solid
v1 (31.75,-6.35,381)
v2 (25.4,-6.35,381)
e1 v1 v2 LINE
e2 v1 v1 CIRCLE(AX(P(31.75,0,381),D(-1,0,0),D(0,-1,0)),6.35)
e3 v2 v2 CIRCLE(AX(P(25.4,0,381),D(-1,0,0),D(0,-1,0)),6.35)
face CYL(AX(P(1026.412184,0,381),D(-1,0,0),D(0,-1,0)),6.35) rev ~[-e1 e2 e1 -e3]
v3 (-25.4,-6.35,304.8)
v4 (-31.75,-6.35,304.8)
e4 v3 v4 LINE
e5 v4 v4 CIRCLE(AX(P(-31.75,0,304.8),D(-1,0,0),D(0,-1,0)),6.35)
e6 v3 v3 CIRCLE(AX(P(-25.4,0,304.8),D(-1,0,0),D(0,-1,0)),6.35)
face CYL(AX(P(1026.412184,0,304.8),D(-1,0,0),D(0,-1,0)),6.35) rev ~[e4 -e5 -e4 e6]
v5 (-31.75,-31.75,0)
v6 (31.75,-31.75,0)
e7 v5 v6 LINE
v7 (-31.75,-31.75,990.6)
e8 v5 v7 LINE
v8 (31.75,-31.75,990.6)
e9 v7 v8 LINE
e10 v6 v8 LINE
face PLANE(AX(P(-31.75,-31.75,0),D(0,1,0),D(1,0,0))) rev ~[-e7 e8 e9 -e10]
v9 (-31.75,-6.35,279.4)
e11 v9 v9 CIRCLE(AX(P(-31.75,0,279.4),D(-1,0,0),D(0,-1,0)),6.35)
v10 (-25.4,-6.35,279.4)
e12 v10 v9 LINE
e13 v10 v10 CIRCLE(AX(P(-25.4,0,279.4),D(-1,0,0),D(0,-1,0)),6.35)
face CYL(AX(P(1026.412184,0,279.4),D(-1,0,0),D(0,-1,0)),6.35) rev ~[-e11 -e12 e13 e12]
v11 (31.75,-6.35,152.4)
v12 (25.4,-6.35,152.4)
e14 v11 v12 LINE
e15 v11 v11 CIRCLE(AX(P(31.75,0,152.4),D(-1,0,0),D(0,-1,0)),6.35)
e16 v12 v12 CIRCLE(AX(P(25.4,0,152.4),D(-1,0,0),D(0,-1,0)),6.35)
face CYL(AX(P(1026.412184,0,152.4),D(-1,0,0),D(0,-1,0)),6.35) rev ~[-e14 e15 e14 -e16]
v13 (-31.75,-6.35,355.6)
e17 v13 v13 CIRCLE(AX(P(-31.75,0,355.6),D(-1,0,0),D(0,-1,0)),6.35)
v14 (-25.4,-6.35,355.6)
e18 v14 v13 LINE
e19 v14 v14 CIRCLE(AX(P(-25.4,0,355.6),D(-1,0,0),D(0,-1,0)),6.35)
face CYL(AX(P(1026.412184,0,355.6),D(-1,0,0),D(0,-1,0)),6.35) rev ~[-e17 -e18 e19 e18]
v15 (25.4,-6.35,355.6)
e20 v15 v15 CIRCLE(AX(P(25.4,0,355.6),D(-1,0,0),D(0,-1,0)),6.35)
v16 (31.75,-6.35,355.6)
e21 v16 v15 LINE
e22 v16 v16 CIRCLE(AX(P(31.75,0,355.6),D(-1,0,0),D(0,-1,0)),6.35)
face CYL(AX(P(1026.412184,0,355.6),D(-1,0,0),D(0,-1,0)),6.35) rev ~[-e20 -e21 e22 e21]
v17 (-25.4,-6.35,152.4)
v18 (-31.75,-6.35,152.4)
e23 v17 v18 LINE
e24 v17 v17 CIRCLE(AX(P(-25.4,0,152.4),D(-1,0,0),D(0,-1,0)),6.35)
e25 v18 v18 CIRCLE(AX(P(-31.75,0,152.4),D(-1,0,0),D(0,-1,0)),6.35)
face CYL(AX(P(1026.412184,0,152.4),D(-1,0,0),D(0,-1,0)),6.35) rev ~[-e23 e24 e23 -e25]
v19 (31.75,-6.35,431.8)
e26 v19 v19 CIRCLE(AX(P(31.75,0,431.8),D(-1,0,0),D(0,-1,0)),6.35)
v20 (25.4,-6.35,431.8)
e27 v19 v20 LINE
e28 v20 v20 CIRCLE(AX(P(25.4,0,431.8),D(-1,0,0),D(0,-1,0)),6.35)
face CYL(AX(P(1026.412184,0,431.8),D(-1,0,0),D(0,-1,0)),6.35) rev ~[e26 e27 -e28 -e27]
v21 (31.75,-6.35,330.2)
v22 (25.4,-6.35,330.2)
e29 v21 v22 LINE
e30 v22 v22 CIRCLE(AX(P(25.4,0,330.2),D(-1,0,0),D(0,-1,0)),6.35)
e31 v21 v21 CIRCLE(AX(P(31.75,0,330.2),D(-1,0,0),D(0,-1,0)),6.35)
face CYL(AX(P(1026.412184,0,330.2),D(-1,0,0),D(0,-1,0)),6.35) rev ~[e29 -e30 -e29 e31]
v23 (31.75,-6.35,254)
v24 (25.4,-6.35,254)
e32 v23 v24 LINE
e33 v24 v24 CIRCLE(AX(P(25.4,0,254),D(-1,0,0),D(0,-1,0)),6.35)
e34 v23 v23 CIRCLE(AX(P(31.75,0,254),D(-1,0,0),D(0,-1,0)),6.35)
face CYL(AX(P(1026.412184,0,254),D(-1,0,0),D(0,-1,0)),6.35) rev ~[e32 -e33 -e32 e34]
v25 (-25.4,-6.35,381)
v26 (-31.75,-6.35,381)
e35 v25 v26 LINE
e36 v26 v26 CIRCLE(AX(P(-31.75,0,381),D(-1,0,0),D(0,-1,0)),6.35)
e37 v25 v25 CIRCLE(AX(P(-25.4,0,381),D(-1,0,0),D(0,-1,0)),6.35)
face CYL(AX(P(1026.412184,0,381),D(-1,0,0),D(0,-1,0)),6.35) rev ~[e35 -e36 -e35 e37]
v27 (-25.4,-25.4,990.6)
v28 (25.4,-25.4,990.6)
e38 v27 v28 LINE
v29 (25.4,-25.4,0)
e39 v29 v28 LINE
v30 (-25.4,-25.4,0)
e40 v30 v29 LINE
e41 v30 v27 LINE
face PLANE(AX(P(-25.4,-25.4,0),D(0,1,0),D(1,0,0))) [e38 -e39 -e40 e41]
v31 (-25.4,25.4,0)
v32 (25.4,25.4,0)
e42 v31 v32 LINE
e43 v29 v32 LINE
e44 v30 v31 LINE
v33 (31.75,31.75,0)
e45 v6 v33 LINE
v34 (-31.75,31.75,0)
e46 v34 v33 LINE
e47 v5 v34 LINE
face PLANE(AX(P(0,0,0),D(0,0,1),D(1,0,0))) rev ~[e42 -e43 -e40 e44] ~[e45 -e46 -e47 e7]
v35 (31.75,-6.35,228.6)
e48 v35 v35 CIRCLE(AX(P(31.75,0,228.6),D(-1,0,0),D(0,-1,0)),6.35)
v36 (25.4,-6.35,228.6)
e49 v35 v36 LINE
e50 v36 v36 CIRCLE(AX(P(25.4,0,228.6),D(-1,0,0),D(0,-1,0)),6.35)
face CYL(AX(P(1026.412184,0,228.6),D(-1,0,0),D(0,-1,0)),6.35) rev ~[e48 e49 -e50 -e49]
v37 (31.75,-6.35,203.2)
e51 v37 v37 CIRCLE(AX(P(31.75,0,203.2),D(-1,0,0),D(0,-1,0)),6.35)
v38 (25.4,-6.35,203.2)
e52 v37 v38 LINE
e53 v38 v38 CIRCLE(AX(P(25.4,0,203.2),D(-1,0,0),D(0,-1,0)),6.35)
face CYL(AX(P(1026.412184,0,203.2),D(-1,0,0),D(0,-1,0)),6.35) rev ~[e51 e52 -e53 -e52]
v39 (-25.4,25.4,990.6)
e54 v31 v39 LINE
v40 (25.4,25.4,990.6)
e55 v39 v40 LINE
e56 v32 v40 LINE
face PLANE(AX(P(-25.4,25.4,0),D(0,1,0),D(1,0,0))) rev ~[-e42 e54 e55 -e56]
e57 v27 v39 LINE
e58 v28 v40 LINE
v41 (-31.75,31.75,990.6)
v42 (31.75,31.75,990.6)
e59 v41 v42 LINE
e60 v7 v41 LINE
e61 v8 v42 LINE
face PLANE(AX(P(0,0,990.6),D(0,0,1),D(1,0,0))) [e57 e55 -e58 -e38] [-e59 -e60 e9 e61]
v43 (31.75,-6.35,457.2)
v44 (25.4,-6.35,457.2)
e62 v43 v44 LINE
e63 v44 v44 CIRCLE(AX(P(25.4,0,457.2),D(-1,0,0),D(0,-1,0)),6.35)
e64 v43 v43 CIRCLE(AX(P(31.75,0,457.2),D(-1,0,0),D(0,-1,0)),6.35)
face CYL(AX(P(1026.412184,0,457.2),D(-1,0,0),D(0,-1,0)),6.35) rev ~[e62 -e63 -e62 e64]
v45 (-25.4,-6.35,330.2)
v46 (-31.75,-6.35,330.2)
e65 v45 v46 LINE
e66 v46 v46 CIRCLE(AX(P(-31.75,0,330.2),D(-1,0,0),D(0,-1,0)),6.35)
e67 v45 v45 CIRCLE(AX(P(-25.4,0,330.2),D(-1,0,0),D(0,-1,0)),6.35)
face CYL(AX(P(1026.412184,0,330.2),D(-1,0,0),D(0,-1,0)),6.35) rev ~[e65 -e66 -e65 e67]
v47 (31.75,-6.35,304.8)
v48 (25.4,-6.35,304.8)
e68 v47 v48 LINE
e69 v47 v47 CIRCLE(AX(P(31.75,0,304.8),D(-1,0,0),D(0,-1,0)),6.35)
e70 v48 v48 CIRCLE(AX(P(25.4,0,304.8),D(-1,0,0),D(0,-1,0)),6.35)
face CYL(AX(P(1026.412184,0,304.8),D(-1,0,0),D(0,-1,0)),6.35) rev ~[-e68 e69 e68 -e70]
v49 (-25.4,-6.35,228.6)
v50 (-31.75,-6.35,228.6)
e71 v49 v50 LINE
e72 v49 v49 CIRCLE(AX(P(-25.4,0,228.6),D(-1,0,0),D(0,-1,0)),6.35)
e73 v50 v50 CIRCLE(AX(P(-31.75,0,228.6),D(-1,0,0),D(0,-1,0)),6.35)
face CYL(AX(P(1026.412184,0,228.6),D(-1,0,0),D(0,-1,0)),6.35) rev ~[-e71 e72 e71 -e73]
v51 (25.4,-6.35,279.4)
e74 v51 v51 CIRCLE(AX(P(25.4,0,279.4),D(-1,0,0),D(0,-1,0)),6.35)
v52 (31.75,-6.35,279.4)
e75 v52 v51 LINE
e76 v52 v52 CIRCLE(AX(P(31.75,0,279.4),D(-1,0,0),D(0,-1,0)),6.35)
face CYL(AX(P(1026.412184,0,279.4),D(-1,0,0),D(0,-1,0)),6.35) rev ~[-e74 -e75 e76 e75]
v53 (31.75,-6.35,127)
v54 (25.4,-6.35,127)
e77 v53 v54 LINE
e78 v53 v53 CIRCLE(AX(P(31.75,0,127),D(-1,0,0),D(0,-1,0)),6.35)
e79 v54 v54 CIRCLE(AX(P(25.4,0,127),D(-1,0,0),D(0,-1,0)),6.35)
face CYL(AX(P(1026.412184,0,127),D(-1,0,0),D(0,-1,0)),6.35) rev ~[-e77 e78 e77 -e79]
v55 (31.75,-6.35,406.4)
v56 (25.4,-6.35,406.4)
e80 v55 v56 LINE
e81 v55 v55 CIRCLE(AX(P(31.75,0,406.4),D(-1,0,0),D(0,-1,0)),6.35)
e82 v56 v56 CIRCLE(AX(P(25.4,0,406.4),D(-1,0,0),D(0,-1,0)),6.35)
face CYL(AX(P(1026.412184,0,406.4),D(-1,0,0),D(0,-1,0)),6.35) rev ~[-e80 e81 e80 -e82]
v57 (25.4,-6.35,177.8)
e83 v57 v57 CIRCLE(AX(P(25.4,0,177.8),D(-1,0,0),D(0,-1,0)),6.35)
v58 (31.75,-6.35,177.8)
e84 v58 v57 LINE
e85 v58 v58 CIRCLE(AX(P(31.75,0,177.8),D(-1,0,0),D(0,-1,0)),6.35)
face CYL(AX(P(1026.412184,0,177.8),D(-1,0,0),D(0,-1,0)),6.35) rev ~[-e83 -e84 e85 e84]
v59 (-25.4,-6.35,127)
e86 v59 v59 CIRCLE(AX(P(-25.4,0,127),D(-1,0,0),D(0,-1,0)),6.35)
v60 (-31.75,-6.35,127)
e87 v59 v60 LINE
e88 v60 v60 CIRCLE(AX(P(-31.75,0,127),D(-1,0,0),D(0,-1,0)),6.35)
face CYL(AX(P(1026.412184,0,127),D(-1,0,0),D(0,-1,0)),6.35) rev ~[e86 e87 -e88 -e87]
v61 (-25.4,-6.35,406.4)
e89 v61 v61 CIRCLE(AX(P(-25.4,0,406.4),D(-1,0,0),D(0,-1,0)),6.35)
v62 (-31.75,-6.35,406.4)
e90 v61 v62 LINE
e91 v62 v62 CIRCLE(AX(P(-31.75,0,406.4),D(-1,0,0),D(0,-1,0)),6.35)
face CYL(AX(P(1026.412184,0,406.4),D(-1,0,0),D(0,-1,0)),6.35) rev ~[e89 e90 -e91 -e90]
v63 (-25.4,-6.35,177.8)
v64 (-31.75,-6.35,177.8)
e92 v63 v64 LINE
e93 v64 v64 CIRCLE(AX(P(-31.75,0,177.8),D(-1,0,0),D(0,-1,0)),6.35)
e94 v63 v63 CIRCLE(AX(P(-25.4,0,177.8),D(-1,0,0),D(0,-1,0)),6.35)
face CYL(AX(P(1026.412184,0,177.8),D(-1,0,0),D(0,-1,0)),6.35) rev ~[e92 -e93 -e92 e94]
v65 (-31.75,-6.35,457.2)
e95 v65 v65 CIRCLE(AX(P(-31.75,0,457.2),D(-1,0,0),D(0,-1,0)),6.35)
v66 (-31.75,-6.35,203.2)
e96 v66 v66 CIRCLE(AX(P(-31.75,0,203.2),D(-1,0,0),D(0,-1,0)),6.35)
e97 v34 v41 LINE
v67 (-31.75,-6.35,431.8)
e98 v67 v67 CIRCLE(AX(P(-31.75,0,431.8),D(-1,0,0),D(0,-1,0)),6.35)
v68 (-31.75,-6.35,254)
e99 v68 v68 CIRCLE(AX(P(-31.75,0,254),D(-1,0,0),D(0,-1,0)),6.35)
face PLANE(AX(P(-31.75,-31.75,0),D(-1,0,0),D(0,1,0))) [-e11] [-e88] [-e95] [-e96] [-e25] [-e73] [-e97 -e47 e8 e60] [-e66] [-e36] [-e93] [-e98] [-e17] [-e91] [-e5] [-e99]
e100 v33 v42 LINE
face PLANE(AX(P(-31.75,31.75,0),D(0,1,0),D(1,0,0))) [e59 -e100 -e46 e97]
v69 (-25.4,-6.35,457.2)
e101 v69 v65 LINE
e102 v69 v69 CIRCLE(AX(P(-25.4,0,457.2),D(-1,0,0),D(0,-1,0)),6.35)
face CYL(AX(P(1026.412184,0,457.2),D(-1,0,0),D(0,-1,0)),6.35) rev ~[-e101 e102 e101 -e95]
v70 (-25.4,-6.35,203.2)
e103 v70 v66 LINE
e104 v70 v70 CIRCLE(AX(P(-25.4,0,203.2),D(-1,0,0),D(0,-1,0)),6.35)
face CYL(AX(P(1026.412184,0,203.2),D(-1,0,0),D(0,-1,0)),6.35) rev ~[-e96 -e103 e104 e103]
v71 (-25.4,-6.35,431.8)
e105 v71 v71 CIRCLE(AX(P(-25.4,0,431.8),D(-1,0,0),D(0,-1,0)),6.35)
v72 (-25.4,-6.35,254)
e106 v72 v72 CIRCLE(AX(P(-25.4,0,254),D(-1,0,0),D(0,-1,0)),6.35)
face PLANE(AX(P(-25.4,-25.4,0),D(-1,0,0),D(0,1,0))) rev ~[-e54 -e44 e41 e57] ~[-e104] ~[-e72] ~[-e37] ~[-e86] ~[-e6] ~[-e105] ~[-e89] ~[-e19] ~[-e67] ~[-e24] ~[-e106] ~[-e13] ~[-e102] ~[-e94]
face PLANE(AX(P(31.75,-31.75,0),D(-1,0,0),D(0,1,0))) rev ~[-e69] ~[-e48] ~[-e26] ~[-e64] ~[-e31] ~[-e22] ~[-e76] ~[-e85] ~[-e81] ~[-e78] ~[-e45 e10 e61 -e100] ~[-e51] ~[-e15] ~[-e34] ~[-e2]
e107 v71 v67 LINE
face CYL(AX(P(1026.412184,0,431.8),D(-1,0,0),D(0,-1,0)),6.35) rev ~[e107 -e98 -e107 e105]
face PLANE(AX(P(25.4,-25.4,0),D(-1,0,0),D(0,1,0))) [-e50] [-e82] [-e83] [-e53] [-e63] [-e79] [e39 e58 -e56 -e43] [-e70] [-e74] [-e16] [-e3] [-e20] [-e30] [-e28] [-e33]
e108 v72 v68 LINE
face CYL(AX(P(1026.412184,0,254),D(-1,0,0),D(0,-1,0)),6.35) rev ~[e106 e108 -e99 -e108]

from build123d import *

# Parameters (mm, degrees)
F0_W     = 63.5
F0_H     = 63.5
F0_W_2   = 50.8
F0_H_2   = 50.8
F1_DEPTH = 990.6
F3_D     = 12.7


# Not quite as in the source:
# - a length typed as a fraction of an inch, garbled in the dataset ("3 / 203.2 mm" for 3/8 in), is restored


with BuildPart() as f1:
    # F0 (on Top) → F1 (new body)
    with BuildSketch(Plane.XY):
        Rectangle(F0_W, F0_H)
        Rectangle(F0_W_2, F0_H_2, mode=Mode.SUBTRACT)
    extrude(amount=F1_DEPTH)

    # F3 (through all)
    with Locations(Plane.YZ.offset(31.75)):
        with Locations((0, 127), (0, 152.4), (0, 177.8), (0, 203.2), (0, 228.6), (0, 254), (0, 279.4), (0, 304.8), (0, 330.2), (0, 355.6), (0, 381), (0, 406.4), (0, 431.8), (0, 457.2)):
            Hole(F3_D / 2)


solid = f1.part
